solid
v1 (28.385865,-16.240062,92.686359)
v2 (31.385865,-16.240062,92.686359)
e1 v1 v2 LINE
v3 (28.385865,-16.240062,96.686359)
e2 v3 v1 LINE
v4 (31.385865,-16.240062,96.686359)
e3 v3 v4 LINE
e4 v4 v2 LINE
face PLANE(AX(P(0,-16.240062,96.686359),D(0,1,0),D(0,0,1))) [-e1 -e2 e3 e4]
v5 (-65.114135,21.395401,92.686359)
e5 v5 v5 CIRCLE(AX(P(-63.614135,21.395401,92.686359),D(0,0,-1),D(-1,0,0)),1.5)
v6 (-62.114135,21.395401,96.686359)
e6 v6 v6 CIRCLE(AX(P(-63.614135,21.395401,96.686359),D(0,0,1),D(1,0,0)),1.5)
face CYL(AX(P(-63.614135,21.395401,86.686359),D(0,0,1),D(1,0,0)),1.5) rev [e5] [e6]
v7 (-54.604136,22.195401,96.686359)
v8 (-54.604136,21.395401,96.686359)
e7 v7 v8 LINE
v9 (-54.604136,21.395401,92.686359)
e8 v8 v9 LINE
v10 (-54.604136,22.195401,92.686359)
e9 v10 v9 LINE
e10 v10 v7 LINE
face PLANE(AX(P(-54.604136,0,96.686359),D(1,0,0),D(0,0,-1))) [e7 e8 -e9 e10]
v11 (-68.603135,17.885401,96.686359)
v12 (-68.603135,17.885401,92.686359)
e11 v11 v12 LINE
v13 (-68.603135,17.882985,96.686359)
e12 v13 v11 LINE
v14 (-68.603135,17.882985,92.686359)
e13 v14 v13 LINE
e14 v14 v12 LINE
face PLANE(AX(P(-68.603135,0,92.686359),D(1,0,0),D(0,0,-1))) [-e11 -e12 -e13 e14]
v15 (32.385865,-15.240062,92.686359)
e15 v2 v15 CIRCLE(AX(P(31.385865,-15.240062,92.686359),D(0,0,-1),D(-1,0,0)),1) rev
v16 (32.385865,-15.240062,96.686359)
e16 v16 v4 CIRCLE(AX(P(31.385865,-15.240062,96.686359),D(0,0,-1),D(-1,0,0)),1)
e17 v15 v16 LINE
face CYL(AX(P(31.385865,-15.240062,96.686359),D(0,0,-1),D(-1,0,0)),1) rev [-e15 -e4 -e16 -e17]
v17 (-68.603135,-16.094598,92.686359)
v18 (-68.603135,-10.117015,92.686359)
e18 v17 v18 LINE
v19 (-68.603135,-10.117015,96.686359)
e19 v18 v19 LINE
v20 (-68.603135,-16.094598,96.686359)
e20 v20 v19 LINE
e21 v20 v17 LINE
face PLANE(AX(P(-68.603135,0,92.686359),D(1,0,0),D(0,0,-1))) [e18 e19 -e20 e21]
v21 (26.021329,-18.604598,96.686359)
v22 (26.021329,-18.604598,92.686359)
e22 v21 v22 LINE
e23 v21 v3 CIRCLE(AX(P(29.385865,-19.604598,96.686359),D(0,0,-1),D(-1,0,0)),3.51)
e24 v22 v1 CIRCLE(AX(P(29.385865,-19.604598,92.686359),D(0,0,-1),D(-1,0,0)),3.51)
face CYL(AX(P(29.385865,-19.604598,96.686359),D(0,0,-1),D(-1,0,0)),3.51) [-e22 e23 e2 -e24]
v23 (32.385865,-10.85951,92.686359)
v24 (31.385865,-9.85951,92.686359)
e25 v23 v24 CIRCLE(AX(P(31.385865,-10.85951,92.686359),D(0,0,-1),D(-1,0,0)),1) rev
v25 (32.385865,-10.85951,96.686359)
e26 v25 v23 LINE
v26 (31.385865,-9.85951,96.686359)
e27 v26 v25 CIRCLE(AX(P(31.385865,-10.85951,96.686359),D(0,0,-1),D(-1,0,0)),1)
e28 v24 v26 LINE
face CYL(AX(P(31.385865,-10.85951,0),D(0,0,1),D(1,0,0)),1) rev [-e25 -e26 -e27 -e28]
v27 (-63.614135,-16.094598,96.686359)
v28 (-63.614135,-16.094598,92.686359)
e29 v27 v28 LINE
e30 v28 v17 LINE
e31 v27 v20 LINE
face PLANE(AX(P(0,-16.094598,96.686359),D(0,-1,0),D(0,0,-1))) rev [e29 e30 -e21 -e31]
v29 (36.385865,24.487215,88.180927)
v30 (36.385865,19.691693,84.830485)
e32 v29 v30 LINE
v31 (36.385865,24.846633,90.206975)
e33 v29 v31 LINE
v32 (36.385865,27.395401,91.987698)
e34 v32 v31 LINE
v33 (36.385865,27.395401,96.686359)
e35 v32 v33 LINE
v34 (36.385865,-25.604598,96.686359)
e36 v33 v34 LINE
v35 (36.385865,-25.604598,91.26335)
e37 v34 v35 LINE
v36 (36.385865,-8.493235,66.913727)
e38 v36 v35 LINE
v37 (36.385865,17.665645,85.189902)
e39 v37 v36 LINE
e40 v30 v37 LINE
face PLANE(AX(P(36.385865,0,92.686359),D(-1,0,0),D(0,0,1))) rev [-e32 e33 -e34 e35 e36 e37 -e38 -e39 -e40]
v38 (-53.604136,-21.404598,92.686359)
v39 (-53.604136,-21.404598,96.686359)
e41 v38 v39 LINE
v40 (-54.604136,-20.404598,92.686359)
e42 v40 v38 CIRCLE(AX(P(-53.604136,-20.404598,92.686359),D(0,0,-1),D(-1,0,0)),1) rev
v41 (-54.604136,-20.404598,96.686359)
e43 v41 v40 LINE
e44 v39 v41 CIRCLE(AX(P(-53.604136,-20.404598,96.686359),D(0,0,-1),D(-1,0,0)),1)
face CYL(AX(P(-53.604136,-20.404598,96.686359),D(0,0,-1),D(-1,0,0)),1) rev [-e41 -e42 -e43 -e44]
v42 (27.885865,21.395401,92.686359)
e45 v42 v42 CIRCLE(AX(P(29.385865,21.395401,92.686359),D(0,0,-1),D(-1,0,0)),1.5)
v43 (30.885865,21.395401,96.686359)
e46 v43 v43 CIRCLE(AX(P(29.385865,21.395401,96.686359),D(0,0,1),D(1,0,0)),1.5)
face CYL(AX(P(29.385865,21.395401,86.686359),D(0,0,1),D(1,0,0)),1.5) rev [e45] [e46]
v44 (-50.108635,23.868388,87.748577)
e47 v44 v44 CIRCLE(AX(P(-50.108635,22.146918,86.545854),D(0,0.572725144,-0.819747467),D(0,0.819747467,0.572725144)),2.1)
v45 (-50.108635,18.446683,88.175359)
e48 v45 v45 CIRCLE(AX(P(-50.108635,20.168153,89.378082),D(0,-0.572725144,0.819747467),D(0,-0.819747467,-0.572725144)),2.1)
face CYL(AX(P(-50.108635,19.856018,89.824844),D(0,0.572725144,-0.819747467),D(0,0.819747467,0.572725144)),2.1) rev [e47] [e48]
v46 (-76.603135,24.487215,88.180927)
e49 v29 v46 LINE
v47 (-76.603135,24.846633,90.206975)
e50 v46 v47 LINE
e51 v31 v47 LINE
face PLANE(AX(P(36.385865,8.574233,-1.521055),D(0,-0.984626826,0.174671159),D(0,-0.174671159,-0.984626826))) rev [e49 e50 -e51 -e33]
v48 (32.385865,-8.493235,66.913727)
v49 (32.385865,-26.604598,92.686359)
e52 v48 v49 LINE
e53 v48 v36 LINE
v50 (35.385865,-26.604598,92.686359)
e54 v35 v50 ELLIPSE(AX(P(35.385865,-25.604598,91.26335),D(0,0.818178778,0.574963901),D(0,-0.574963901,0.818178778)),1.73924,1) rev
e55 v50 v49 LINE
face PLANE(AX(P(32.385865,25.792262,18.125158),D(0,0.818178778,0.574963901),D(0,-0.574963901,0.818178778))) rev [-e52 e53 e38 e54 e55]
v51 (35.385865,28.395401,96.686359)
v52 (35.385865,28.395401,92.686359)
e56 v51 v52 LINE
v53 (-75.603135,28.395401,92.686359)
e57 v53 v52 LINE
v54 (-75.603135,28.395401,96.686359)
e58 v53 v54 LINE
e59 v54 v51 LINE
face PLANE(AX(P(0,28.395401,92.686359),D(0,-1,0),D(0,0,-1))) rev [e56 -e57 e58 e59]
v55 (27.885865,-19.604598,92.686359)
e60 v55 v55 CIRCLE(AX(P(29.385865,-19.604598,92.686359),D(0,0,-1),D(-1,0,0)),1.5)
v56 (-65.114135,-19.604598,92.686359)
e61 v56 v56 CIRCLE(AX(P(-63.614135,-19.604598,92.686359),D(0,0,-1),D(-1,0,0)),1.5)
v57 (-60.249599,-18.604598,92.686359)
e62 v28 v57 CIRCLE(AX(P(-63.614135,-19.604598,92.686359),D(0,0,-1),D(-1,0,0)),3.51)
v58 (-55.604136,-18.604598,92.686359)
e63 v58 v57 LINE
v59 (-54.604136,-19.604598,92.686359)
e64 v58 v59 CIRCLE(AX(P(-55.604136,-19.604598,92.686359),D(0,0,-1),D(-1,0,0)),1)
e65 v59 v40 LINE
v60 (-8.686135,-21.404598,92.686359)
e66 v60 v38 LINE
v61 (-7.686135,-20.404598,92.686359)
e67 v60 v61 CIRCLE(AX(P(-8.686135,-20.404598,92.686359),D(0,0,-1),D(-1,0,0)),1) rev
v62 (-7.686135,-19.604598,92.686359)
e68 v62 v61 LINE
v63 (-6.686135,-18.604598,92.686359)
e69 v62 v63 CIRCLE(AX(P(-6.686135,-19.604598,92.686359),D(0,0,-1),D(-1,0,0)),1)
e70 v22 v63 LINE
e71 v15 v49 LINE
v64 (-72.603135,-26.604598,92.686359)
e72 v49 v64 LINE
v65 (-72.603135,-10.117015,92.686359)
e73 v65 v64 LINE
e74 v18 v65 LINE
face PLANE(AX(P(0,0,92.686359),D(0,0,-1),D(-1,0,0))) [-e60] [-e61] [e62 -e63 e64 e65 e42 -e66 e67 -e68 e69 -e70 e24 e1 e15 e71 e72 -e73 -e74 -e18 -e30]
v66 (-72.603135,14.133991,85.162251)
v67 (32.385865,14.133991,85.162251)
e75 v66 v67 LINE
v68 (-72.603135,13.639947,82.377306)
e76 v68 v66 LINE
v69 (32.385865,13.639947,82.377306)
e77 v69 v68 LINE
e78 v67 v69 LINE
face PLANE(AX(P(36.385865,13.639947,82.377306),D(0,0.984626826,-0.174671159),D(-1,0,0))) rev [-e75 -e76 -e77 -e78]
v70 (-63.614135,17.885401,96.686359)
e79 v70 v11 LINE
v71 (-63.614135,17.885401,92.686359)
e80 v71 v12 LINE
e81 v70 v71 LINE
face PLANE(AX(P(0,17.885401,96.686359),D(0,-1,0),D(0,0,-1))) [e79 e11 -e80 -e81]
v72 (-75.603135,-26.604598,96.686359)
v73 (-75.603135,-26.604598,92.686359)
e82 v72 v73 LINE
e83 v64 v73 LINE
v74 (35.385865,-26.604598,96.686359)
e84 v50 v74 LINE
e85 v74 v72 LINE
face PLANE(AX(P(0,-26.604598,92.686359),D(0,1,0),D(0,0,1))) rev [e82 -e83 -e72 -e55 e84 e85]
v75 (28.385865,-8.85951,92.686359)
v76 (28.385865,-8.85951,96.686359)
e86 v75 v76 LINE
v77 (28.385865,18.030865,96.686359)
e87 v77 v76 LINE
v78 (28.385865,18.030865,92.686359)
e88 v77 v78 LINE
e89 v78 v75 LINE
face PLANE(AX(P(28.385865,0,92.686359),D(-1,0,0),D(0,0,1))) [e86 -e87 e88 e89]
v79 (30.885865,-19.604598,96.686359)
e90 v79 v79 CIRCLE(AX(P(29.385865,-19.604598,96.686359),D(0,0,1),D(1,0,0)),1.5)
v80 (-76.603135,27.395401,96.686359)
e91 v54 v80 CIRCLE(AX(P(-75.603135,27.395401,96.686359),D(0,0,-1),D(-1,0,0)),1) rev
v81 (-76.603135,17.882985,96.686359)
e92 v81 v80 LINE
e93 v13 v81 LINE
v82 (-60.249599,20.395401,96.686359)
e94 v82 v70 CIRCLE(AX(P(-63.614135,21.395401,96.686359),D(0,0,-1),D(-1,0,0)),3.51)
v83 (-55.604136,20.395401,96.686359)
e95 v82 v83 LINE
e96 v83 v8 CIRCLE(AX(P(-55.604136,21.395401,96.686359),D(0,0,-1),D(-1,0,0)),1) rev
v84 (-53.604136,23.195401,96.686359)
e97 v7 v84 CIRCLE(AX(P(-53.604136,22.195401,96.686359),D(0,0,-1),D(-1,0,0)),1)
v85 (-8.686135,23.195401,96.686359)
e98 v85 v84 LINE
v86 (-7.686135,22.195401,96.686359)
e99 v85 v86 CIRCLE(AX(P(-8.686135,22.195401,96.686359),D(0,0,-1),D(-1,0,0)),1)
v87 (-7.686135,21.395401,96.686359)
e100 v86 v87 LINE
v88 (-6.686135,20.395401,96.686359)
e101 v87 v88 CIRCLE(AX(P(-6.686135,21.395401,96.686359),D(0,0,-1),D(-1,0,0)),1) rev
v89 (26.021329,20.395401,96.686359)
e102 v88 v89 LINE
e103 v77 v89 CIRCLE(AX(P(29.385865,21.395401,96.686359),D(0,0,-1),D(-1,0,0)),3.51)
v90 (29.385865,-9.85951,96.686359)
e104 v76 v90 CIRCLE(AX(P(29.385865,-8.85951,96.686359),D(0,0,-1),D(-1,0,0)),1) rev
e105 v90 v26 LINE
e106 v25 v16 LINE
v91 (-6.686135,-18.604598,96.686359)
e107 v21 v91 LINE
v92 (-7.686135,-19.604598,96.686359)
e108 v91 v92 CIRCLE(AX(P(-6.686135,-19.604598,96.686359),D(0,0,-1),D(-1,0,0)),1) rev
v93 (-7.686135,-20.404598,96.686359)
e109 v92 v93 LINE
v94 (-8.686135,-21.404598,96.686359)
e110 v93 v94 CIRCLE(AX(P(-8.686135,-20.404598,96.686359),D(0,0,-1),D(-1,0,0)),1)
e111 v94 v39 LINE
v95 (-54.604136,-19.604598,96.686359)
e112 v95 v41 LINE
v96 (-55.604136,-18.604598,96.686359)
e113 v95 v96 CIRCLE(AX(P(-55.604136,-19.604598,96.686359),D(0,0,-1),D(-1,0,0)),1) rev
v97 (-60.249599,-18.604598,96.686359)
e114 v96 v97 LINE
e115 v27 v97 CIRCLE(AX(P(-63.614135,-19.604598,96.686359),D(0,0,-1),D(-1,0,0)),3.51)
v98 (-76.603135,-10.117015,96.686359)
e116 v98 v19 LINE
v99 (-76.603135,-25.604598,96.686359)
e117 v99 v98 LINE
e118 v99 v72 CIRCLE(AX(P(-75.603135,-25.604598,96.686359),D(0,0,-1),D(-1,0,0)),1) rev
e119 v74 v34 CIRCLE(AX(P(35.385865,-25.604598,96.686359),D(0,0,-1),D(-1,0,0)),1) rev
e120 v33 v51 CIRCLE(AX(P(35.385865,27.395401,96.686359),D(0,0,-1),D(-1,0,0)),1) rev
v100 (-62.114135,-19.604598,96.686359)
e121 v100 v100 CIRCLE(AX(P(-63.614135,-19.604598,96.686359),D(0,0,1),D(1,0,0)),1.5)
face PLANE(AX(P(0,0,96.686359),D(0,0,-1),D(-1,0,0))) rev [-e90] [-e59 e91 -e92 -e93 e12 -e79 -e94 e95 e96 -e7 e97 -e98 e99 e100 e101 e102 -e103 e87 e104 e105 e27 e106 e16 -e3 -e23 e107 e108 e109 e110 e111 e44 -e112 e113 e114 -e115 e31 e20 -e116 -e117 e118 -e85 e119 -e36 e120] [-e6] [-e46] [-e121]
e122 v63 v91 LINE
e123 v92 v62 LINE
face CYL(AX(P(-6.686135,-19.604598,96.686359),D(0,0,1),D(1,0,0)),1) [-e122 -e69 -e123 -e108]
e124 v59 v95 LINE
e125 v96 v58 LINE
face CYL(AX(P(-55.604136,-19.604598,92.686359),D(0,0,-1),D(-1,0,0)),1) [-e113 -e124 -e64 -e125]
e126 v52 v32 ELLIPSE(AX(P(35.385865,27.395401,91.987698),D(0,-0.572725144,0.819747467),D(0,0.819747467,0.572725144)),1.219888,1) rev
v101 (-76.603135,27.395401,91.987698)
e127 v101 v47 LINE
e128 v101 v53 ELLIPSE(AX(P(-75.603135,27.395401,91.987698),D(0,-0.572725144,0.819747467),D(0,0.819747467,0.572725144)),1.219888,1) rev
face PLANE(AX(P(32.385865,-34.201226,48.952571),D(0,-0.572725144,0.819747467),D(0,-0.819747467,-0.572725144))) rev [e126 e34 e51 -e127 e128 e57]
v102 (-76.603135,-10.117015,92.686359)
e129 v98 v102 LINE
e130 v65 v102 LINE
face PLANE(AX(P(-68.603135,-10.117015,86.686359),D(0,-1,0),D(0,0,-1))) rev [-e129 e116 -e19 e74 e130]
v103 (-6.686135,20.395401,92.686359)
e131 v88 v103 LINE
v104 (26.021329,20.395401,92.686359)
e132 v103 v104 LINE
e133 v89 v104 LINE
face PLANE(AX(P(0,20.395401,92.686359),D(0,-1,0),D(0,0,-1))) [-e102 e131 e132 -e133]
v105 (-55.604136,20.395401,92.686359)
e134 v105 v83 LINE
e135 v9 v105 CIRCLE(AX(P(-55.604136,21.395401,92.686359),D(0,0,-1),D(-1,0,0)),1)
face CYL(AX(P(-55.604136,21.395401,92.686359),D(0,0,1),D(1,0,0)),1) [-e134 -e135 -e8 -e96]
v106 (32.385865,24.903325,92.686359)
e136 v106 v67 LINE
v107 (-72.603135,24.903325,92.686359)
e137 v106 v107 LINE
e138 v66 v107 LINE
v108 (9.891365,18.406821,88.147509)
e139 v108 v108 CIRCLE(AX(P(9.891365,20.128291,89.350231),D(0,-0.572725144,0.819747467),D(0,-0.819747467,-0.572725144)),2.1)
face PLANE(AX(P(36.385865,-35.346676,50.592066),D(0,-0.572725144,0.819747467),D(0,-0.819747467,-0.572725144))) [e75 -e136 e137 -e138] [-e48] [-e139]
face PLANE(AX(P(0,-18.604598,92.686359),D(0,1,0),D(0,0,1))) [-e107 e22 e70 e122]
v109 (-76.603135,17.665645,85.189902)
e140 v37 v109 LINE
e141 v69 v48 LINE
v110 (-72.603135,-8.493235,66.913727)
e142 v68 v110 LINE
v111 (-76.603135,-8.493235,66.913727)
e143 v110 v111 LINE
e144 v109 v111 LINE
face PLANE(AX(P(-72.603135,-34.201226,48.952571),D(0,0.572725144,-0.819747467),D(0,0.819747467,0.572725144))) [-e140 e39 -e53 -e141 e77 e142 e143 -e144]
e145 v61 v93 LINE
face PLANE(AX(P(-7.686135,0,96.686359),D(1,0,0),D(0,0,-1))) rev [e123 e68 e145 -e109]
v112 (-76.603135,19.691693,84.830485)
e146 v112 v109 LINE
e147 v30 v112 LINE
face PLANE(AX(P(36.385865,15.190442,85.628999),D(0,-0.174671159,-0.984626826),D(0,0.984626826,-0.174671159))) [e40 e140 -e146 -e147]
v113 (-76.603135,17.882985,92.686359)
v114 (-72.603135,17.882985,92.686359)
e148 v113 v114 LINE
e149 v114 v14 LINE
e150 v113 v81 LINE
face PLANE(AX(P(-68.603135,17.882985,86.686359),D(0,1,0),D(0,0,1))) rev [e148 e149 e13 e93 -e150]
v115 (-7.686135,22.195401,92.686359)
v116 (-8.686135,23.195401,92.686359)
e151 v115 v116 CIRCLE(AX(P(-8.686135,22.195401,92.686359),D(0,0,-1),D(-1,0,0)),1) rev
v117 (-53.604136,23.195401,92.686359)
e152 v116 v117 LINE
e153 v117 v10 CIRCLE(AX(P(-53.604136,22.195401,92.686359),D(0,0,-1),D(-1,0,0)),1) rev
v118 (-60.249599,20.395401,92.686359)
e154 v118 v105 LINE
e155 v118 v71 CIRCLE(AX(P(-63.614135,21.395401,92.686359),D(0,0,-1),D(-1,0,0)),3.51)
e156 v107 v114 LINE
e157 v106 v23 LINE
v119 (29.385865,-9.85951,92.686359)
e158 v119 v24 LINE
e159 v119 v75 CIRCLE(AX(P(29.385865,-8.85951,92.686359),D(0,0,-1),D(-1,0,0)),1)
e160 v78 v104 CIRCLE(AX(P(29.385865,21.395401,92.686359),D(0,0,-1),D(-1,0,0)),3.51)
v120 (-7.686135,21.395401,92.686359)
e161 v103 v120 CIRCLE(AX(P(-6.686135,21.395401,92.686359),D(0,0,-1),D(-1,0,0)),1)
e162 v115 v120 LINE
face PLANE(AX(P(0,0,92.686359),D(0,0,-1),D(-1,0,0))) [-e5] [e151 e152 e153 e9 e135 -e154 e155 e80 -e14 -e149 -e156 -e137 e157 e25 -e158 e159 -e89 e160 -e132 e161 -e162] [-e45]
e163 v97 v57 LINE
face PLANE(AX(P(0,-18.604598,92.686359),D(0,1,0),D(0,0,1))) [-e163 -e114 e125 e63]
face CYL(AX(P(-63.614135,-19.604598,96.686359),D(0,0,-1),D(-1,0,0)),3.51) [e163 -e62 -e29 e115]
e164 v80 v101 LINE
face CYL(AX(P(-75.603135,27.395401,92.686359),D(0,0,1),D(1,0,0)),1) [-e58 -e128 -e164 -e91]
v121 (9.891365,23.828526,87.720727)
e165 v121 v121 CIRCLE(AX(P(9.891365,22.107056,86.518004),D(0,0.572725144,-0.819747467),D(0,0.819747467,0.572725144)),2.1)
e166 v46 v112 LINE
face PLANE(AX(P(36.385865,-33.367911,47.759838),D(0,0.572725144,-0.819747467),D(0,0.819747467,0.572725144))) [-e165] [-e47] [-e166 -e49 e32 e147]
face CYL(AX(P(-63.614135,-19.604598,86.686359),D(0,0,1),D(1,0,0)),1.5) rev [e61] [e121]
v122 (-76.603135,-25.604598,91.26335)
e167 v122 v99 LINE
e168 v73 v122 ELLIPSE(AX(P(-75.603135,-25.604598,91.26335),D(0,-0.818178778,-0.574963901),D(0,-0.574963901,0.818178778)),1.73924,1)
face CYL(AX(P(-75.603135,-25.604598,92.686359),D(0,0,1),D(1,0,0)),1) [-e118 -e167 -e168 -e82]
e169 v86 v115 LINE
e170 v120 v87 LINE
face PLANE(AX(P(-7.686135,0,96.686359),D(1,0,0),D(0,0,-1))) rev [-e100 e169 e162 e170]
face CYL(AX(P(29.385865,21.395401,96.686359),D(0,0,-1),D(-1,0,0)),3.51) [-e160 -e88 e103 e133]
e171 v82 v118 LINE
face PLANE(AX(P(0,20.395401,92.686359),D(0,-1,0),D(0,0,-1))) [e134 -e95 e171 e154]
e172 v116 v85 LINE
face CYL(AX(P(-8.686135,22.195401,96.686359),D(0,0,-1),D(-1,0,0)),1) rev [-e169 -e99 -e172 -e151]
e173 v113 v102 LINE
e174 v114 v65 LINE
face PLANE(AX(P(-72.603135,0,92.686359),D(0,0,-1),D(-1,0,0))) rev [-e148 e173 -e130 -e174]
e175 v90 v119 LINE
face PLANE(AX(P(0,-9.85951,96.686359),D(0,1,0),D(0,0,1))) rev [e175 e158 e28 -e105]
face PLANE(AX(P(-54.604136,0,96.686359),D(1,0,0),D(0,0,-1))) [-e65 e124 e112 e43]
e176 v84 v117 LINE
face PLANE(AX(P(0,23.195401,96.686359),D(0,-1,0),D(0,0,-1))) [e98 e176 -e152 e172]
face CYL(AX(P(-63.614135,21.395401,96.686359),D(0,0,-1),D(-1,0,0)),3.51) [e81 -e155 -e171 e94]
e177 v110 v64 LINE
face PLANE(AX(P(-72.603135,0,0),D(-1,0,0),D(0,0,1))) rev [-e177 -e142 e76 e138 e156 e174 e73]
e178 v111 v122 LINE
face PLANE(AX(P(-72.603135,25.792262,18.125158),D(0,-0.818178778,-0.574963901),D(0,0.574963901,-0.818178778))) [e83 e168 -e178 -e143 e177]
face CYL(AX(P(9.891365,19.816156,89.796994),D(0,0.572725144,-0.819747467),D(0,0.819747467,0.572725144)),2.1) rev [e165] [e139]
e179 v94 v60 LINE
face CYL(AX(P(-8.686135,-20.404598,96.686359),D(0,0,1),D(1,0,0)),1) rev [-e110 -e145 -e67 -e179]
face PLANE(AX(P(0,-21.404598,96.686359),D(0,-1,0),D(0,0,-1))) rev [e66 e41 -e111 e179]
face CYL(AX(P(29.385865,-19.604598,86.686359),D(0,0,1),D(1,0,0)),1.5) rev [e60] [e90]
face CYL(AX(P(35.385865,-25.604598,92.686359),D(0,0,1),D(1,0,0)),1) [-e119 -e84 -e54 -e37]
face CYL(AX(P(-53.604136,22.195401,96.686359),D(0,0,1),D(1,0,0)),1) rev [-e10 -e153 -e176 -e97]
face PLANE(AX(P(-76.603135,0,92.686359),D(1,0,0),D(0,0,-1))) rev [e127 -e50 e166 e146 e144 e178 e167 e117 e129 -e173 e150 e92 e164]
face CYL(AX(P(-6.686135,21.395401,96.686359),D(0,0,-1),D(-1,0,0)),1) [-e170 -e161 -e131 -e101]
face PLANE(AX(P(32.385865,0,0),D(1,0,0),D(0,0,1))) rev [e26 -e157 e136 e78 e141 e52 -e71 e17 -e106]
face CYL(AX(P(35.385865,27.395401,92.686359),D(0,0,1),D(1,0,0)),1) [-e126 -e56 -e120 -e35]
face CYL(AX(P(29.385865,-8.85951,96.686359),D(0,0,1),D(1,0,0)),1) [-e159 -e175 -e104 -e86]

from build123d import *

# Parameters (mm, degrees)
SKETCH_1_W          = 112.98899933
SKETCH_1_H          = 54.999998897
SKETCH_1_W_2        = 96.98899933
SKETCH_1_H_2        = 38.999998897
EXTRUDE_1_DEPTH     = 4
EXTRUDE_1_2_DEPTH   = 4
SKETCH_2_R          = 1.5
SKETCH_2_W          = 8
SKETCH_2_H          = 28
CUT_EXTRUDE_1_DEPTH = 10
EXTRUDE_2_DEPTH     = 4
EXTRUDE_3_DEPTH     = 112.988999
CHAMFER_1_SIZE      = 2
CUT_EXTRUDE_2_DEPTH = 4
SKETCH_7_W          = 4
SKETCH_7_H          = 6.380551841
SKETCH_7_W_2        = 46.91800116
SKETCH_7_H_2        = 38.999998897
SKETCH_7_H_3        = 2.8
CUT_EXTRUDE_3_DEPTH = 4
FILLET_2_R          = 1
FILLET_4_R          = 1


with BuildPart() as part:
    # 스케치1 → Extrude 1 (new body)
    with BuildSketch(Plane(origin=(0, 0, 96.68635878), x_dir=(-1, 0, 0), z_dir=(0, 0, -1))):
        with Locations((20.108635155, 0.89540154)):
            Rectangle(SKETCH_1_W, SKETCH_1_H)
        with Locations((20.108635155, 0.89540154)):
            Rectangle(SKETCH_1_W_2, SKETCH_1_H_2, mode=Mode.SUBTRACT)
    extrude(amount=EXTRUDE_1_DEPTH)

    # 스케치3 → Extrude 1 2 (add)
    with BuildSketch(Plane(origin=(0, 0, 92.68635878), x_dir=(-1, 0, 0), z_dir=(0, 0, -1))):
        with BuildLine():
            Line((-28.38586451, 20.395400989), (-26.02132888, 20.395400989))
            ThreePointArc((-26.02132888, 20.395400989), (-25.912420969, 20.89013871), (-25.87586451, 21.395400989))
            ThreePointArc((-25.87586451, 21.395400989), (-32.199234375, 23.494222087), (-28.38586451, 18.03086536))
            Line((-28.38586451, 18.03086536), (-28.38586451, 20.395400989))
        make_face()
        with BuildLine():
            ThreePointArc((-28.38586451, 18.03086536), (-26.903919708, 18.913456187), (-26.02132888, 20.395400989))
            Line((-26.02132888, 20.395400989), (-28.38586451, 20.395400989))
            Line((-28.38586451, 20.395400989), (-28.38586451, 18.03086536))
        make_face()
        with BuildLine():
            Line((-28.38586451, -18.604597908), (-28.38586451, -16.24006219))
            ThreePointArc((-28.38586451, -16.24006219), (-32.199234375, -21.703418917), (-25.87586451, -19.604597819))
            ThreePointArc((-25.87586451, -19.604597819), (-25.912420962, -19.099335586), (-26.021328854, -18.604597908))
            Line((-26.021328854, -18.604597908), (-28.38586451, -18.604597908))
        make_face()
        with BuildLine():
            ThreePointArc((-26.021328854, -18.604597908), (-26.903919675, -17.12265305), (-28.38586451, -16.24006219))
            Line((-28.38586451, -16.24006219), (-28.38586451, -18.604597908))
            Line((-28.38586451, -18.604597908), (-26.021328854, -18.604597908))
        make_face()
        with BuildLine():
            ThreePointArc((66.978670192, -18.604597908), (65.712955672, -16.791227981), (63.614134537, -16.094597819))
            Line((63.614134537, -16.094597819), (63.614134537, -18.604597908))
            Line((63.614134537, -18.604597908), (66.978670192, -18.604597908))
        make_face()
        with BuildLine():
            Line((63.614134537, -18.604597908), (63.614134537, -16.094597819))
            ThreePointArc((63.614134537, -16.094597819), (61.515313402, -16.791227981), (60.249598881, -18.604597908))
            Line((60.249598881, -18.604597908), (63.614134537, -18.604597908))
        make_face()
        with BuildLine():
            Line((66.978670192, -18.604597908), (63.614134537, -18.604597908))
            Line((63.614134537, -18.604597908), (63.614134537, -23.114597819))
            ThreePointArc((63.614134537, -23.114597819), (66.096079339, -22.086542621), (67.124134537, -19.604597819))
            ThreePointArc((67.124134537, -19.604597819), (67.087578084, -19.099335586), (66.978670192, -18.604597908))
        make_face()
        with BuildLine():
            Line((63.614134537, -23.114597819), (63.614134537, -18.604597908))
            Line((63.614134537, -18.604597908), (60.249598881, -18.604597908))
            ThreePointArc((60.249598881, -18.604597908), (60.800764699, -21.703418954), (63.614134537, -23.114597819))
        make_face()
        with BuildLine():
            Line((68.60313482, -18.604597908), (68.60313482, -16.094597819))
            Line((68.60313482, -16.094597819), (63.614134537, -16.094597819))
            ThreePointArc((63.614134537, -16.094597819), (65.712955672, -16.791227981), (66.978670192, -18.604597908))
            Line((66.978670192, -18.604597908), (68.60313482, -18.604597908))
        make_face()
        with BuildLine():
            ThreePointArc((60.249598907, 20.395400989), (61.515313439, 18.582031123), (63.614134537, 17.885400989))
            Line((63.614134537, 17.885400989), (63.614134537, 20.395400989))
            Line((63.614134537, 20.395400989), (60.249598907, 20.395400989))
        make_face()
        with BuildLine():
            Line((63.614134537, 20.395400989), (63.614134537, 17.885400989))
            ThreePointArc((63.614134537, 17.885400989), (65.712955634, 18.582031123), (66.978670166, 20.395400989))
            Line((66.978670166, 20.395400989), (63.614134537, 20.395400989))
        make_face()
        with BuildLine():
            Line((60.249598907, 20.395400989), (63.614134537, 20.395400989))
            Line((63.614134537, 20.395400989), (63.614134537, 24.905400989))
            ThreePointArc((63.614134537, 24.905400989), (60.800764671, 23.494222087), (60.249598907, 20.395400989))
        make_face()
        with BuildLine():
            Line((63.614134537, 24.905400989), (63.614134537, 20.395400989))
            Line((63.614134537, 20.395400989), (66.978670166, 20.395400989))
            ThreePointArc((66.978670166, 20.395400989), (67.087578077, 20.89013871), (67.124134537, 21.395400989))
            ThreePointArc((67.124134537, 21.395400989), (66.096079339, 23.877345791), (63.614134537, 24.905400989))
        make_face()
        with BuildLine():
            ThreePointArc((66.978670166, 20.395400989), (65.712955634, 18.582031123), (63.614134537, 17.885400989))
            Line((63.614134537, 17.885400989), (68.60313482, 17.885400989))
            Line((68.60313482, 17.885400989), (68.60313482, 20.395400989))
            Line((68.60313482, 20.395400989), (66.978670166, 20.395400989))
        make_face()
    extrude(amount=-EXTRUDE_1_2_DEPTH)

    # 스케치2 → 컷-돌출1 (cut)
    with BuildSketch(Plane.XY.offset(96.68635878)):
        with Locations((-63.614134537, -19.604597819)):
            Circle(SKETCH_2_R)
        with Locations((29.38586451, -19.604597819)):
            Circle(SKETCH_2_R)
        with Locations((29.38586451, 21.395400989)):
            Circle(SKETCH_2_R)
        with Locations((-63.614134537, 21.395400989)):
            Circle(SKETCH_2_R)
        with Locations((-72.60313482, 3.882984922)):
            Rectangle(SKETCH_2_W, SKETCH_2_H)
    extrude(amount=-CUT_EXTRUDE_1_DEPTH, mode=Mode.SUBTRACT)

    # 스케치4 → 보스-돌출2 (add)
    with BuildSketch(Plane.ZY.offset(76.60313482)):
        Polygon((92.68635878, -26.604597908), (92.68635878, 28.395400989), (66.913727288, -8.493235012), align=None)
    extrude_2 = extrude(amount=-EXTRUDE_2_DEPTH)

    # 대칭 복사1: 보스-돌출2 across plane
    add(extrude_2.mirror(Plane.ZY.offset(20.108635155)))

    # 스케치5 → 보스-돌출3 (add)
    with BuildSketch(Plane.ZY.offset(76.60313482)):
        Polygon((84.830484946, 19.691692545), (85.189902425, 17.665644896), (90.206974689, 24.846632704), (88.18092704, 24.487215225), align=None)
        Polygon((85.189902425, 17.665644896), (85.075357396, 17.501695402), (82.377306183, 13.639946589), (84.016801117, 12.4944963), (95.126134542, 28.395400989), (92.68635878, 28.395400989), (90.321519717, 25.010582197), (90.206974689, 24.846632704), align=None)
    extrude(amount=-EXTRUDE_3_DEPTH)

    # 모따기1
    chamfer_1_edges = [part.edges().sort_by_distance(p)[0] for p in [
        (-20.108635155, 12.4944963, 84.016801117),
    ]]
    chamfer(chamfer_1_edges, length=CHAMFER_1_SIZE - 0.0001)  # a hair under: the kernel refuses the full size

    # 스케치6 → 컷-돌출2 (cut)
    with BuildSketch(Plane(origin=(0, -33.367910571, 47.759838088), x_dir=(-1, 0, 0), z_dir=(0, 0.5727251442659632, -0.8197474666783251))):
        with BuildLine():
            ThreePointArc((52.208634465, 67.723569041), (50.106933191, 69.821866387), (48.008635845, 67.720165113))
            Line((48.008635845, 67.720165113), (50.108635155, 67.721867077))
            Line((50.108635155, 67.721867077), (52.208634465, 67.723569041))
        make_face()
        with BuildLine():
            Line((50.108635155, 67.721867077), (48.008635845, 67.720165113))
            ThreePointArc((48.008635845, 67.720165113), (50.109486137, 65.62186725), (52.208635155, 67.721867077))
            ThreePointArc((52.208635155, 67.721867077), (52.208634983, 67.722718059), (52.208634465, 67.723569041))
            Line((52.208634465, 67.723569041), (50.108635155, 67.721867077))
        make_face()
        with BuildLine():
            ThreePointArc((-7.791365535, 67.674941484), (-9.893066809, 69.77323883), (-11.991364155, 67.671537556))
            Line((-11.991364155, 67.671537556), (-9.891364845, 67.67323952))
            Line((-9.891364845, 67.67323952), (-7.791365535, 67.674941484))
        make_face()
        with BuildLine():
            Line((-9.891364845, 67.67323952), (-11.991364155, 67.671537556))
            ThreePointArc((-11.991364155, 67.671537556), (-9.890513863, 65.573239692), (-7.791364845, 67.67323952))
            ThreePointArc((-7.791364845, 67.67323952), (-7.791365017, 67.674090502), (-7.791365535, 67.674941484))
            Line((-7.791365535, 67.674941484), (-9.891364845, 67.67323952))
        make_face()
    extrude(amount=-CUT_EXTRUDE_2_DEPTH, mode=Mode.SUBTRACT)

    # 스케치7 → 컷-돌출3 (cut)
    with BuildSketch(Plane(origin=(0, 0, 92.68635878), x_dir=(-1, 0, 0), z_dir=(0, 0, -1))):
        with Locations((-30.38586451, -13.04978627)):
            Rectangle(SKETCH_7_W, SKETCH_7_H)
        with Locations((31.145135519, 0.89540154)):
            Rectangle(SKETCH_7_W_2, SKETCH_7_H_2)
        with Locations((31.145135519, 21.795400989)):
            Rectangle(SKETCH_7_W_2, SKETCH_7_H_3)
        with Locations((31.145135519, -20.004597908)):
            Rectangle(SKETCH_7_W_2, SKETCH_7_H_3)
    extrude(amount=-CUT_EXTRUDE_3_DEPTH, mode=Mode.SUBTRACT)

    # 필렛2
    fillet_2_edges = [part.edges().sort_by_distance(p)[0] for p in [
        (-7.686134939, 20.395400989, 94.68635878),
        (-54.604136099, 20.395400989, 94.68635878),
        (28.38586451, -9.859510349, 94.68635878),
        (32.38586451, -16.24006219, 94.68635878),
        (32.38586451, -9.859510349, 94.68635878),
        (-54.604136099, -18.604597908, 94.68635878),
        (-7.686134939, -18.604597908, 94.68635878),
        (-7.686134939, -21.404597908, 94.68635878),
        (-54.604136099, 23.195400989, 94.68635878),
        (-54.604136099, -21.404597908, 94.68635878),
        (-7.686134939, 23.195400989, 94.68635878),
    ]]
    fillet(fillet_2_edges, radius=FILLET_2_R)

    # 필렛4
    fillet_4_edges = [part.edges().sort_by_distance(p)[0] for p in [
        (36.38586451, 28.395400989, 94.68635878),
        (-76.60313482, 28.395400989, 94.68635878),
        (-76.60313482, -26.604597908, 94.68635878),
        (36.38586451, -26.604597908, 94.68635878),
    ]]
    fillet(fillet_4_edges, radius=FILLET_4_R)


solid = part.part
